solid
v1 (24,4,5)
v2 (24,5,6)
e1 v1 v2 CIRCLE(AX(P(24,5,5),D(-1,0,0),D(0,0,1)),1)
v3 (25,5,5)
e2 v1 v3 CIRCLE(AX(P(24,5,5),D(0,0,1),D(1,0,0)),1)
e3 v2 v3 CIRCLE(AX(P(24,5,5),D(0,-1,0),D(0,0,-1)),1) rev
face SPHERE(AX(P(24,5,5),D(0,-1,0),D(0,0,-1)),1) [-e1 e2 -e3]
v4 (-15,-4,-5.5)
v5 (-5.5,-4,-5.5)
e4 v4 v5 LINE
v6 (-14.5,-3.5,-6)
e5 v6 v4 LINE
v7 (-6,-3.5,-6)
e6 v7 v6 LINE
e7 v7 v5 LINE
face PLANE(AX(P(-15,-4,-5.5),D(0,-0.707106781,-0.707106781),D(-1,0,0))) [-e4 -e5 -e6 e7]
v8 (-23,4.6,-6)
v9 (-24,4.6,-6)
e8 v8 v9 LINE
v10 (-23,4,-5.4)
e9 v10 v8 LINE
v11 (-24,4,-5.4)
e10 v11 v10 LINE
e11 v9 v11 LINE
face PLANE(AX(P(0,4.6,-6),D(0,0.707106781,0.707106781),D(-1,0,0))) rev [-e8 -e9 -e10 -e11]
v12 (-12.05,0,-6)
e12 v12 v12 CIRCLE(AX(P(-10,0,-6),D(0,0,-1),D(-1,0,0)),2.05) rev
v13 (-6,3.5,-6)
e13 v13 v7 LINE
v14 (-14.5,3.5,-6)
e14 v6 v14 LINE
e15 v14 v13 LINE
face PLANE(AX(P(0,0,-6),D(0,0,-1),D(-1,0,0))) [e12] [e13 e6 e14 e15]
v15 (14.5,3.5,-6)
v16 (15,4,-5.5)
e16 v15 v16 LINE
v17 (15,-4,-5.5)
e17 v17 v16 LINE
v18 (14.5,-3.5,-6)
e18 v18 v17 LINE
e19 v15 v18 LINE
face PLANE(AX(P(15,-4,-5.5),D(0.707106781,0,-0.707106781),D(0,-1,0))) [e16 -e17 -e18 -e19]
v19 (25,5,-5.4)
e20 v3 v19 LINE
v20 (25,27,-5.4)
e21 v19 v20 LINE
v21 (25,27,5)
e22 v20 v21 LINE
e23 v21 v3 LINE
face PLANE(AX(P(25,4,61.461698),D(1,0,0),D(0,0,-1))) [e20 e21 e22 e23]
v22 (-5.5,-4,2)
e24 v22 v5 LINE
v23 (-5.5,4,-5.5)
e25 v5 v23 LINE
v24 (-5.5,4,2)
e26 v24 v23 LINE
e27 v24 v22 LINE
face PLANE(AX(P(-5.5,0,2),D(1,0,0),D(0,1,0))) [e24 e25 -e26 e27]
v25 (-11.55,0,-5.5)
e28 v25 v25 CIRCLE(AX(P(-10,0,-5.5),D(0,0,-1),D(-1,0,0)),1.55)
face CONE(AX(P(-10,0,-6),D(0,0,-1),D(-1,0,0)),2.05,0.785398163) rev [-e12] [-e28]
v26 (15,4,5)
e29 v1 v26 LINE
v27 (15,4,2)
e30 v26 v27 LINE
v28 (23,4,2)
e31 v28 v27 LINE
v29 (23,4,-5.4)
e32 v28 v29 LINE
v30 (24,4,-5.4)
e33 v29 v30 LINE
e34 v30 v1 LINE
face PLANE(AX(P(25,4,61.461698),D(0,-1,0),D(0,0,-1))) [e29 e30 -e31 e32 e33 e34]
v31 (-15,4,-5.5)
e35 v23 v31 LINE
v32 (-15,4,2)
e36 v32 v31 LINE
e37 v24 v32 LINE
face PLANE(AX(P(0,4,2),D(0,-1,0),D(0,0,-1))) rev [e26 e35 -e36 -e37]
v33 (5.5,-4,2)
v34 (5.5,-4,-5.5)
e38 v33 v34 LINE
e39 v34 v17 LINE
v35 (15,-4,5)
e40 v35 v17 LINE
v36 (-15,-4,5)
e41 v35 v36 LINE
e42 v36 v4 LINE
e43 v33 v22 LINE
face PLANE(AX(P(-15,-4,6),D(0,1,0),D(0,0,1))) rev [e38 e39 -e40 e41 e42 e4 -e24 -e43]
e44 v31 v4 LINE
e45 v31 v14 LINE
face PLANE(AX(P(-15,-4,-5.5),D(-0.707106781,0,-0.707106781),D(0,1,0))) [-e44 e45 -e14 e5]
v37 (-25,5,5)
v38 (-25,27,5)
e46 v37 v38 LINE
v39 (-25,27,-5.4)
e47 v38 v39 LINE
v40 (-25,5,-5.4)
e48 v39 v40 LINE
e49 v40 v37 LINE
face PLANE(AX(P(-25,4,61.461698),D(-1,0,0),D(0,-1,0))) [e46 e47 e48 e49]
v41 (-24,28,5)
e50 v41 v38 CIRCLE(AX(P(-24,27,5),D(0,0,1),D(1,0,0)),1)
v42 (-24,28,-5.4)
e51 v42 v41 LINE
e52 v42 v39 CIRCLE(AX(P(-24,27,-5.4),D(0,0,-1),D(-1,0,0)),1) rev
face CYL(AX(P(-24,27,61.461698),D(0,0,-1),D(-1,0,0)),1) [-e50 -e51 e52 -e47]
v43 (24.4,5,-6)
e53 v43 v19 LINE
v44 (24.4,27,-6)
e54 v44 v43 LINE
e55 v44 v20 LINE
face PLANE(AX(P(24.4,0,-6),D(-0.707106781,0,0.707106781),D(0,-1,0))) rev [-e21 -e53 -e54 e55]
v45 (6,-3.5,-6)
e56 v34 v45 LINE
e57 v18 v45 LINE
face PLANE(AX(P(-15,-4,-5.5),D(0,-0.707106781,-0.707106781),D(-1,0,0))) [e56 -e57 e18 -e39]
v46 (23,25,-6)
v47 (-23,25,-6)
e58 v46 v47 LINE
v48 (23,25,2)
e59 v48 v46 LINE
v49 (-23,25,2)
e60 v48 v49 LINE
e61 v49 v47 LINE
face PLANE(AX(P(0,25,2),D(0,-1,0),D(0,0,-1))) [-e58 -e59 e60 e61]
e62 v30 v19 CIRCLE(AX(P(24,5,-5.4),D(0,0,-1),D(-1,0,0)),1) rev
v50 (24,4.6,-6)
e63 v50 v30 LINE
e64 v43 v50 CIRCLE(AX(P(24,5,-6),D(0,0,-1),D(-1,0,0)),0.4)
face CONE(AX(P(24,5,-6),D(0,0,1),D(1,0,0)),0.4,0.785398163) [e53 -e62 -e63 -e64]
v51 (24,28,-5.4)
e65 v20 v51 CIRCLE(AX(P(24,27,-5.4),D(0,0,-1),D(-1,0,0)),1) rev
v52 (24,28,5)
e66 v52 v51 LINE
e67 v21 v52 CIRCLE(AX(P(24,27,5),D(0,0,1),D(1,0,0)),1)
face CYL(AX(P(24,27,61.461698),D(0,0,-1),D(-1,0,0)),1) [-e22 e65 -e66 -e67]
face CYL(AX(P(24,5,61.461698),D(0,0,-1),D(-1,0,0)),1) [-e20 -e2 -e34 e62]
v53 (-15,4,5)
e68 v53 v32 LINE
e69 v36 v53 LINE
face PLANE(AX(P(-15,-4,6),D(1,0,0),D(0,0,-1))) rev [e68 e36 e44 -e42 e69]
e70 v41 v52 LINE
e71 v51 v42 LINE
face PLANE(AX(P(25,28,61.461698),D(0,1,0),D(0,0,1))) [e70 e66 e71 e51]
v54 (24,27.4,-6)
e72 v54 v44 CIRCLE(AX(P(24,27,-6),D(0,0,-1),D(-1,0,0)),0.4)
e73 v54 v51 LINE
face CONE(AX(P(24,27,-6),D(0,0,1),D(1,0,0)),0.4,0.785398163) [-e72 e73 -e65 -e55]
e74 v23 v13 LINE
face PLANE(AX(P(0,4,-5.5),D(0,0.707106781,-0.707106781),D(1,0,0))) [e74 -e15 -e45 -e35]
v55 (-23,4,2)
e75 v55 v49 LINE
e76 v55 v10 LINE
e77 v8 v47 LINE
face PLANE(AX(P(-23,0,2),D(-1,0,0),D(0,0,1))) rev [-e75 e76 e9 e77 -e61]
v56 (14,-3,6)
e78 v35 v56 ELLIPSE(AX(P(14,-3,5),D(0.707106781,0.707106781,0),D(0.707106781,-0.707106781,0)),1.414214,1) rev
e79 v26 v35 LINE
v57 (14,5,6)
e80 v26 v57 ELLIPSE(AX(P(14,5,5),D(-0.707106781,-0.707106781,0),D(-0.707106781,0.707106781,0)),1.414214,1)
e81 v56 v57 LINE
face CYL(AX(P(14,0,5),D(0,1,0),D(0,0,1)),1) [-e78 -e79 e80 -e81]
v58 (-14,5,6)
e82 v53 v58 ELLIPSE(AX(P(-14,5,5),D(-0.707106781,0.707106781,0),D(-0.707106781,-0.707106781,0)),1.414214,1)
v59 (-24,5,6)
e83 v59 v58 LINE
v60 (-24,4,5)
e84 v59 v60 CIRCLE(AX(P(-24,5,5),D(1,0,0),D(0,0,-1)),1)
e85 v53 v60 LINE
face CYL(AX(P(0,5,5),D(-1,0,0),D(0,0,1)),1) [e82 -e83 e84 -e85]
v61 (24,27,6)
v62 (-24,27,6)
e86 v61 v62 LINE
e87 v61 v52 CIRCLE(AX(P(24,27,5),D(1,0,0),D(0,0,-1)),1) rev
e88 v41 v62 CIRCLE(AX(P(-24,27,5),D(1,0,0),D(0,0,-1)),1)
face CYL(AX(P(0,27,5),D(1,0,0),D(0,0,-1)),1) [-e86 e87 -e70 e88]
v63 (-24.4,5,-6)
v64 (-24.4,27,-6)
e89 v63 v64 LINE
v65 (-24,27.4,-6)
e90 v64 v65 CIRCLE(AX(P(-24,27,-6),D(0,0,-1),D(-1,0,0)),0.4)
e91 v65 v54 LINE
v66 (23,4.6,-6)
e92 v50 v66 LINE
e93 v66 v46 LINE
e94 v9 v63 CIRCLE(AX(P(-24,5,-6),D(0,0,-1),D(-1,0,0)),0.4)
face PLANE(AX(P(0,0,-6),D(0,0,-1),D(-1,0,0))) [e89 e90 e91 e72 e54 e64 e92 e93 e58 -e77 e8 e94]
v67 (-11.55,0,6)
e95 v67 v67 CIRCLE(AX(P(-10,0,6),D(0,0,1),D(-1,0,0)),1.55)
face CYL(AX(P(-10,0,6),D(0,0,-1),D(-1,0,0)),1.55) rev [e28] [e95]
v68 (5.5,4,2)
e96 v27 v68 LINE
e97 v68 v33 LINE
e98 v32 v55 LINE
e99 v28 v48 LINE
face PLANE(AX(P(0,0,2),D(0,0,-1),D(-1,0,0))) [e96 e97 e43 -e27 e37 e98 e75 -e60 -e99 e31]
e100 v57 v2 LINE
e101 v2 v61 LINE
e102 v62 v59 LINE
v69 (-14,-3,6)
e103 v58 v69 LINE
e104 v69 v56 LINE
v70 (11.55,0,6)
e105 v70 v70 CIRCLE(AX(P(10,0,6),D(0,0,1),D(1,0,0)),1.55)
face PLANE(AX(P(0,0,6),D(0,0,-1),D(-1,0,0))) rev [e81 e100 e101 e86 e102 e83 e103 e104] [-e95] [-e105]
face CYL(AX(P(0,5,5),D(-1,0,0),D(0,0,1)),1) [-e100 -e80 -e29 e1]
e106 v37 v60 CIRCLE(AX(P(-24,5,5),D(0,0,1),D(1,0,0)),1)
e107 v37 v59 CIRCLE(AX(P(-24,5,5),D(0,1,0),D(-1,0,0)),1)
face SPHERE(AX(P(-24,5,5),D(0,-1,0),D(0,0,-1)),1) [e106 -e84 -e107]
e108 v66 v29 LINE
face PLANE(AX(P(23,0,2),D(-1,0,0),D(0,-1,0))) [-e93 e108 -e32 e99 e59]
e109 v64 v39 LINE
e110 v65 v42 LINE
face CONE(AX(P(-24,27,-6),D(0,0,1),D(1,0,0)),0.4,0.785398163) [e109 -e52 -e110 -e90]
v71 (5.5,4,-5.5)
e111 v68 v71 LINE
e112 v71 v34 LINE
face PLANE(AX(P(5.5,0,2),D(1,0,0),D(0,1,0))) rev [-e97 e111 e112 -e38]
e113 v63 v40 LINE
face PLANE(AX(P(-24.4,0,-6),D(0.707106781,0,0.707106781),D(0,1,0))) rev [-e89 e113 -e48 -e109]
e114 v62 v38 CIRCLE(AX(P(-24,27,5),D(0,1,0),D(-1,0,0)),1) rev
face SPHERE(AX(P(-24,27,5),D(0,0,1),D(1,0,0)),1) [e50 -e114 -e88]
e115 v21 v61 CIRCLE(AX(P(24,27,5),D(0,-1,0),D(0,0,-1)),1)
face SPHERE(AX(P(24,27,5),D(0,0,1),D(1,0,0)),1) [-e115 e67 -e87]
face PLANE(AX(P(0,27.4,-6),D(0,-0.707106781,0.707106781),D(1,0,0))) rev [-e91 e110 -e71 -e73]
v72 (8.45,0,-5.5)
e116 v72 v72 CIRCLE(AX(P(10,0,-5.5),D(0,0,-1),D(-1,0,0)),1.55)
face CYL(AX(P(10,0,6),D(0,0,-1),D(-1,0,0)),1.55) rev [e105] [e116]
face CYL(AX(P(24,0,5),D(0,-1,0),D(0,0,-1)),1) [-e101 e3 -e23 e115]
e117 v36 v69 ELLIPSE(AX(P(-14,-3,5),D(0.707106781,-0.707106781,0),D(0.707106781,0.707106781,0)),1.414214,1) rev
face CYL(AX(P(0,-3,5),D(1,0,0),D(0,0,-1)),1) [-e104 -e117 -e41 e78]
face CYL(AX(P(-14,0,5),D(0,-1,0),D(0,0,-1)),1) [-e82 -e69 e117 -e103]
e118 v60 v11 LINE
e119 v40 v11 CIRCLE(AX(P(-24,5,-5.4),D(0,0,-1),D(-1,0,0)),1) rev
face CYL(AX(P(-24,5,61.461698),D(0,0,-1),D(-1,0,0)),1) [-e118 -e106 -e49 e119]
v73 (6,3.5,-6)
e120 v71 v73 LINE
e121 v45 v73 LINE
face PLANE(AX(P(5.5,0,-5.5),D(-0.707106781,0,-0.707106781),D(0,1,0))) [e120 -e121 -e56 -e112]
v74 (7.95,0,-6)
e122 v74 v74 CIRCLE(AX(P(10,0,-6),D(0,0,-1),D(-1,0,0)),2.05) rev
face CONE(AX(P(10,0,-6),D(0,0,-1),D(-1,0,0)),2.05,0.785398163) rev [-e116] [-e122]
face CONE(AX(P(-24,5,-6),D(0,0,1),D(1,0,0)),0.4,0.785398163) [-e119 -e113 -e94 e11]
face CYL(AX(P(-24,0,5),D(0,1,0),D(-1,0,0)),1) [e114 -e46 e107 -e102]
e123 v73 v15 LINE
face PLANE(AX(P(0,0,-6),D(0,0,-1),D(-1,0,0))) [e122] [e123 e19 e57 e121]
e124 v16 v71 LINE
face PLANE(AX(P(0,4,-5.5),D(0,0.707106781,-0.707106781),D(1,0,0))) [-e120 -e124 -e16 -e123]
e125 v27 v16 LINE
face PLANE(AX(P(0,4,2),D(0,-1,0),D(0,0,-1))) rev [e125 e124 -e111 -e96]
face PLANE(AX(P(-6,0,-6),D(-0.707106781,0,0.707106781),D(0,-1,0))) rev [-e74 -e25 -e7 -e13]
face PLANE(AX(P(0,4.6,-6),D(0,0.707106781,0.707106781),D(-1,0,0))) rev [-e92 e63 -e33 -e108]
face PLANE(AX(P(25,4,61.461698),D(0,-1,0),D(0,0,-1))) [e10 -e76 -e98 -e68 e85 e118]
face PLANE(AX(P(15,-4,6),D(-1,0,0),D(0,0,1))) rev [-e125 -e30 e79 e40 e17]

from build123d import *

# Parameters (mm, degrees)
SKETCH1_W           = 30
SKETCH1_H           = 8
SKETCH1_R           = 1.55
BOSS_EXTRUDE1_DEPTH = 6
SKETCH6_W           = 50
SKETCH6_H           = 24
BOSS_EXTRUDE4_DEPTH = 12
SKETCH8_W           = 11
SKETCH8_H           = 8
CUT_EXTRUDE2_DEPTH  = 8
FILLET1_R           = 1
FILLET2_R           = 1
CHAMFER2_SIZE       = 0.6
CHAMFER3_SIZE       = 0.5


with BuildPart() as part:
    # Sketch1 → Boss-Extrude1 (new, symmetric)
    with BuildSketch(Plane.XY):
        Rectangle(SKETCH1_W, SKETCH1_H)
        with Locations((10, 0)):
            Circle(SKETCH1_R, mode=Mode.SUBTRACT)
        with Locations(Location((-10, 0, 0), (0, 0, 180))):
            Circle(SKETCH1_R, mode=Mode.SUBTRACT)
    extrude(amount=BOSS_EXTRUDE1_DEPTH, both=True)

    # Sketch6 → Boss-Extrude4 (add)
    with BuildSketch(Plane(origin=(0, 0, -6), x_dir=(-1, 0, 0), z_dir=(0, 0, -1))):
        with Locations((0, 16)):
            Rectangle(SKETCH6_W, SKETCH6_H)
    extrude(amount=-BOSS_EXTRUDE4_DEPTH)

    # Sketch8 → Cut-Extrude2 (cut)
    with BuildSketch(Plane(origin=(0, 0, -6), x_dir=(-1, 0, 0), z_dir=(0, 0, -1))):
        Rectangle(SKETCH8_W, SKETCH8_H)
        Polygon((-23, 25), (-23, 4), (-15, 4), (-5.5, 4), (5.5, 4), (15, 4), (23, 4), (23, 25), align=None)
    extrude(amount=-CUT_EXTRUDE2_DEPTH, mode=Mode.SUBTRACT)

    # Fillet1
    fillet1_edges = [part.edges().sort_by_distance(p)[0] for p in [
        (25, 16, 6),
        (0, 28, 6),
        (-25, 16, 6),
    ]]
    fillet(fillet1_edges, radius=FILLET1_R)

    # Fillet2
    # the kernel refuses this fillet: 1 mm, written as the material it takes off along each edge
    with BuildSketch(Plane(origin=(24, 27, 5), x_dir=(0, 1, 0), z_dir=(1, 0, 0))) as fillet2_piece_1_section:
        Polygon((0, 0), (FILLET2_R, 0), (FILLET2_R, FILLET2_R), (0, FILLET2_R), align=None)
    fillet2_piece_1 = extrude(amount=FILLET2_R, mode=Mode.PRIVATE)
    fillet2_piece_1 = fillet2_piece_1 - Plane(origin=(24, 27, 5), x_dir=(0, -0.7071067811865475, -0.7071067811865475), z_dir=(1, 0, 0)) * Sphere(FILLET2_R, mode=Mode.PRIVATE)
    add(fillet2_piece_1, mode=Mode.SUBTRACT)
    with BuildSketch(Plane(origin=(-24, 27, 5), x_dir=(-1, 0, 0), z_dir=(0, 1, 0))) as fillet2_piece_2_section:
        Polygon((0, 0), (FILLET2_R, 0), (FILLET2_R, FILLET2_R), (0, FILLET2_R), align=None)
    fillet2_piece_2 = extrude(amount=FILLET2_R, mode=Mode.PRIVATE)
    fillet2_piece_2 = fillet2_piece_2 - Plane(origin=(-24, 27, 5), x_dir=(0.7071067811865475, 0, -0.7071067811865475), z_dir=(0, 1, 0)) * Sphere(FILLET2_R, mode=Mode.PRIVATE)
    add(fillet2_piece_2, mode=Mode.SUBTRACT)
    with BuildSketch(Plane(origin=(-15, 4, 6), x_dir=(1, 0, 0), z_dir=(0, -1, 0)), Plane(origin=(15, -6.5, 6), x_dir=(-1, 0, 0), z_dir=(0, 1, 0))) as fillet2_piece_3:
        with BuildLine():
            CenterArc((FILLET2_R, -FILLET2_R), FILLET2_R, 90, 90)
            Line((0, -FILLET2_R), (0, 0))
            Line((0, 0), (FILLET2_R, 0))
        make_face()
    extrude(amount=10.5, mode=Mode.SUBTRACT)
    with BuildSketch(Plane(origin=(-17.5, -4, 6), x_dir=(0, 1, 0), z_dir=(1, 0, 0))) as fillet2_piece_4:
        with BuildLine():
            CenterArc((FILLET2_R, -FILLET2_R), FILLET2_R, 90, 90)
            Line((0, -FILLET2_R), (0, 0))
            Line((0, 0), (FILLET2_R, 0))
        make_face()
    extrude(amount=35, mode=Mode.SUBTRACT)
    with BuildSketch(Plane(origin=(24, 4, 6), x_dir=(0, 0, -1), z_dir=(-1, 0, 0))) as fillet2_piece_5:
        with BuildLine():
            CenterArc((FILLET2_R, -FILLET2_R), FILLET2_R, 90, 90)
            Line((0, -FILLET2_R), (0, 0))
            Line((0, 0), (FILLET2_R, 0))
        make_face()
    extrude(amount=9, mode=Mode.SUBTRACT)
    with BuildSketch(Plane(origin=(-15, 4, 6), x_dir=(0, 1, 0), z_dir=(-1, 0, 0))) as fillet2_piece_6:
        with BuildLine():
            CenterArc((FILLET2_R, FILLET2_R), FILLET2_R, 180, 90)
            Line((0, FILLET2_R), (0, 0))
            Line((0, 0), (FILLET2_R, 0))
        make_face()
    extrude(amount=9, mode=Mode.SUBTRACT)
    with BuildSketch(Plane(origin=(-25, 4, -8.5), x_dir=(1, 0, 0), z_dir=(0, 0, 1))) as fillet2_piece_7:
        with BuildLine():
            CenterArc((FILLET2_R, FILLET2_R), FILLET2_R, 180, 90)
            Line((0, FILLET2_R), (0, 0))
            Line((0, 0), (FILLET2_R, 0))
        make_face()
    extrude(amount=13.5, mode=Mode.SUBTRACT)
    with BuildSketch(Plane(origin=(-24, 4, 5), x_dir=(0, 0, 1), z_dir=(1, 0, 0))) as fillet2_piece_8:
        with BuildLine():
            CenterArc((1 - FILLET2_R, -FILLET2_R), FILLET2_R, 0, 90)
            Line((1 - FILLET2_R, 0), (1, 0))
            Line((1, 0), (1, -FILLET2_R))
        make_face()
    revolve(axis=Axis((-24, 4, 5), (0, -1, 0)), revolution_arc=90, mode=Mode.SUBTRACT)
    with BuildSketch(Plane(origin=(-25, 28, -8.5), x_dir=(1, 0, 0), z_dir=(0, 0, 1)), Plane(origin=(25, 4, -8.5), x_dir=(-1, 0, 0), z_dir=(0, 0, 1)), Plane(origin=(25, 28, -8.5), x_dir=(0, -1, 0), z_dir=(0, 0, 1))) as fillet2_piece_9:
        with BuildLine():
            CenterArc((FILLET2_R, -FILLET2_R), FILLET2_R, 90, 90)
            Line((0, -FILLET2_R), (0, 0))
            Line((0, 0), (FILLET2_R, 0))
        make_face()
    extrude(amount=13.5, mode=Mode.SUBTRACT)
    with BuildSketch(Plane(origin=(24, 4, 5), x_dir=(0, 0, 1), z_dir=(-1, 0, 0))) as fillet2_piece_10:
        with BuildLine():
            CenterArc((1 - FILLET2_R, FILLET2_R), FILLET2_R, 270, 90)
            Line((1, FILLET2_R), (1, 0))
            Line((1, 0), (1 - FILLET2_R, 0))
        make_face()
    revolve(axis=Axis((24, 4, 5), (0, 1, 0)), revolution_arc=90, mode=Mode.SUBTRACT)
    with BuildSketch(Plane(origin=(-15, 6.5, 6), x_dir=(1, 0, 0), z_dir=(0, -1, 0))) as fillet2_piece_11a_section:
        with BuildLine():
            CenterArc((FILLET2_R, -FILLET2_R), FILLET2_R, 90, 90)
            Line((0, -FILLET2_R), (0, 0))
            Line((0, 0), (FILLET2_R, 0))
        make_face()
    fillet2_piece_11a = extrude(amount=13, mode=Mode.PRIVATE)
    fillet2_piece_11a = split(fillet2_piece_11a, bisect_by=Plane(origin=(-14.773604886, 4, 5.773604886), z_dir=(0, 1, 0)), keep=Keep.TOP, mode=Mode.PRIVATE)
    with BuildSketch(Plane(origin=(-12.5, 4, 6), x_dir=(0, 1, 0), z_dir=(-1, 0, 0))) as fillet2_piece_11b_section:
        with BuildLine():
            CenterArc((FILLET2_R, FILLET2_R), FILLET2_R, 180, 90)
            Line((0, FILLET2_R), (0, 0))
            Line((0, 0), (FILLET2_R, 0))
        make_face()
    fillet2_piece_11b = extrude(amount=11.5, mode=Mode.PRIVATE)
    fillet2_piece_11b = split(fillet2_piece_11b, bisect_by=Plane(origin=(-15, 4.226395114, 5.773604886), z_dir=(1, 0, 0)), keep=Keep.TOP, mode=Mode.PRIVATE)
    fillet2_piece_11 = fillet2_piece_11a & fillet2_piece_11b
    add(fillet2_piece_11, mode=Mode.SUBTRACT)
    with BuildSketch(Plane(origin=(24, 4, 6), x_dir=(0, 0, -1), z_dir=(-1, 0, 0))) as fillet2_piece_12a_section:
        with BuildLine():
            CenterArc((FILLET2_R, -FILLET2_R), FILLET2_R, 90, 90)
            Line((0, -FILLET2_R), (0, 0))
            Line((0, 0), (FILLET2_R, 0))
        make_face()
    fillet2_piece_12a = extrude(amount=11.5, mode=Mode.PRIVATE)
    fillet2_piece_12a = split(fillet2_piece_12a, bisect_by=Plane(origin=(15, 4.226395114, 5.773604886), z_dir=(-1, 0, 0)), keep=Keep.TOP, mode=Mode.PRIVATE)
    with BuildSketch(Plane(origin=(15, -6.5, 6), x_dir=(-1, 0, 0), z_dir=(0, 1, 0))) as fillet2_piece_12b_section:
        with BuildLine():
            CenterArc((FILLET2_R, -FILLET2_R), FILLET2_R, 90, 90)
            Line((0, -FILLET2_R), (0, 0))
            Line((0, 0), (FILLET2_R, 0))
        make_face()
    fillet2_piece_12b = extrude(amount=13, mode=Mode.PRIVATE)
    fillet2_piece_12b = split(fillet2_piece_12b, bisect_by=Plane(origin=(14.773604886, 4, 5.773604886), z_dir=(0, 1, 0)), keep=Keep.TOP, mode=Mode.PRIVATE)
    fillet2_piece_12 = fillet2_piece_12a & fillet2_piece_12b
    add(fillet2_piece_12, mode=Mode.SUBTRACT)

    # Chamfer2
    chamfer2_edges = [part.edges().sort_by_distance(p)[0] for p in [
        (-25, 16, -6),
        (0, 28, -6),
        (25, 16, -6),
        (24.707106781, 27.707106781, -6),
        (-24.707106781, 27.707106781, -6),
        (24.707106781, 4.292893219, -6),
        (-24.707106781, 4.292893219, -6),
        (-23.5, 4, -6),
        (23.5, 4, -6),
    ]]
    chamfer(chamfer2_edges, length=CHAMFER2_SIZE)

    # Chamfer3
    chamfer3_edges = [part.edges().sort_by_distance(p)[0] for p in [
        (8.45, 0, -6),
        (-8.45, 0, -6),
        (10.25, -4, -6),
        (-5.5, 0, -6),
        (-10.25, -4, -6),
        (-15, 0, -6),
        (-10.25, 4, -6),
        (10.25, 4, -6),
        (5.5, 0, -6),
        (15, 0, -6),
    ]]
    chamfer(chamfer3_edges, length=CHAMFER3_SIZE)


solid = part.part
